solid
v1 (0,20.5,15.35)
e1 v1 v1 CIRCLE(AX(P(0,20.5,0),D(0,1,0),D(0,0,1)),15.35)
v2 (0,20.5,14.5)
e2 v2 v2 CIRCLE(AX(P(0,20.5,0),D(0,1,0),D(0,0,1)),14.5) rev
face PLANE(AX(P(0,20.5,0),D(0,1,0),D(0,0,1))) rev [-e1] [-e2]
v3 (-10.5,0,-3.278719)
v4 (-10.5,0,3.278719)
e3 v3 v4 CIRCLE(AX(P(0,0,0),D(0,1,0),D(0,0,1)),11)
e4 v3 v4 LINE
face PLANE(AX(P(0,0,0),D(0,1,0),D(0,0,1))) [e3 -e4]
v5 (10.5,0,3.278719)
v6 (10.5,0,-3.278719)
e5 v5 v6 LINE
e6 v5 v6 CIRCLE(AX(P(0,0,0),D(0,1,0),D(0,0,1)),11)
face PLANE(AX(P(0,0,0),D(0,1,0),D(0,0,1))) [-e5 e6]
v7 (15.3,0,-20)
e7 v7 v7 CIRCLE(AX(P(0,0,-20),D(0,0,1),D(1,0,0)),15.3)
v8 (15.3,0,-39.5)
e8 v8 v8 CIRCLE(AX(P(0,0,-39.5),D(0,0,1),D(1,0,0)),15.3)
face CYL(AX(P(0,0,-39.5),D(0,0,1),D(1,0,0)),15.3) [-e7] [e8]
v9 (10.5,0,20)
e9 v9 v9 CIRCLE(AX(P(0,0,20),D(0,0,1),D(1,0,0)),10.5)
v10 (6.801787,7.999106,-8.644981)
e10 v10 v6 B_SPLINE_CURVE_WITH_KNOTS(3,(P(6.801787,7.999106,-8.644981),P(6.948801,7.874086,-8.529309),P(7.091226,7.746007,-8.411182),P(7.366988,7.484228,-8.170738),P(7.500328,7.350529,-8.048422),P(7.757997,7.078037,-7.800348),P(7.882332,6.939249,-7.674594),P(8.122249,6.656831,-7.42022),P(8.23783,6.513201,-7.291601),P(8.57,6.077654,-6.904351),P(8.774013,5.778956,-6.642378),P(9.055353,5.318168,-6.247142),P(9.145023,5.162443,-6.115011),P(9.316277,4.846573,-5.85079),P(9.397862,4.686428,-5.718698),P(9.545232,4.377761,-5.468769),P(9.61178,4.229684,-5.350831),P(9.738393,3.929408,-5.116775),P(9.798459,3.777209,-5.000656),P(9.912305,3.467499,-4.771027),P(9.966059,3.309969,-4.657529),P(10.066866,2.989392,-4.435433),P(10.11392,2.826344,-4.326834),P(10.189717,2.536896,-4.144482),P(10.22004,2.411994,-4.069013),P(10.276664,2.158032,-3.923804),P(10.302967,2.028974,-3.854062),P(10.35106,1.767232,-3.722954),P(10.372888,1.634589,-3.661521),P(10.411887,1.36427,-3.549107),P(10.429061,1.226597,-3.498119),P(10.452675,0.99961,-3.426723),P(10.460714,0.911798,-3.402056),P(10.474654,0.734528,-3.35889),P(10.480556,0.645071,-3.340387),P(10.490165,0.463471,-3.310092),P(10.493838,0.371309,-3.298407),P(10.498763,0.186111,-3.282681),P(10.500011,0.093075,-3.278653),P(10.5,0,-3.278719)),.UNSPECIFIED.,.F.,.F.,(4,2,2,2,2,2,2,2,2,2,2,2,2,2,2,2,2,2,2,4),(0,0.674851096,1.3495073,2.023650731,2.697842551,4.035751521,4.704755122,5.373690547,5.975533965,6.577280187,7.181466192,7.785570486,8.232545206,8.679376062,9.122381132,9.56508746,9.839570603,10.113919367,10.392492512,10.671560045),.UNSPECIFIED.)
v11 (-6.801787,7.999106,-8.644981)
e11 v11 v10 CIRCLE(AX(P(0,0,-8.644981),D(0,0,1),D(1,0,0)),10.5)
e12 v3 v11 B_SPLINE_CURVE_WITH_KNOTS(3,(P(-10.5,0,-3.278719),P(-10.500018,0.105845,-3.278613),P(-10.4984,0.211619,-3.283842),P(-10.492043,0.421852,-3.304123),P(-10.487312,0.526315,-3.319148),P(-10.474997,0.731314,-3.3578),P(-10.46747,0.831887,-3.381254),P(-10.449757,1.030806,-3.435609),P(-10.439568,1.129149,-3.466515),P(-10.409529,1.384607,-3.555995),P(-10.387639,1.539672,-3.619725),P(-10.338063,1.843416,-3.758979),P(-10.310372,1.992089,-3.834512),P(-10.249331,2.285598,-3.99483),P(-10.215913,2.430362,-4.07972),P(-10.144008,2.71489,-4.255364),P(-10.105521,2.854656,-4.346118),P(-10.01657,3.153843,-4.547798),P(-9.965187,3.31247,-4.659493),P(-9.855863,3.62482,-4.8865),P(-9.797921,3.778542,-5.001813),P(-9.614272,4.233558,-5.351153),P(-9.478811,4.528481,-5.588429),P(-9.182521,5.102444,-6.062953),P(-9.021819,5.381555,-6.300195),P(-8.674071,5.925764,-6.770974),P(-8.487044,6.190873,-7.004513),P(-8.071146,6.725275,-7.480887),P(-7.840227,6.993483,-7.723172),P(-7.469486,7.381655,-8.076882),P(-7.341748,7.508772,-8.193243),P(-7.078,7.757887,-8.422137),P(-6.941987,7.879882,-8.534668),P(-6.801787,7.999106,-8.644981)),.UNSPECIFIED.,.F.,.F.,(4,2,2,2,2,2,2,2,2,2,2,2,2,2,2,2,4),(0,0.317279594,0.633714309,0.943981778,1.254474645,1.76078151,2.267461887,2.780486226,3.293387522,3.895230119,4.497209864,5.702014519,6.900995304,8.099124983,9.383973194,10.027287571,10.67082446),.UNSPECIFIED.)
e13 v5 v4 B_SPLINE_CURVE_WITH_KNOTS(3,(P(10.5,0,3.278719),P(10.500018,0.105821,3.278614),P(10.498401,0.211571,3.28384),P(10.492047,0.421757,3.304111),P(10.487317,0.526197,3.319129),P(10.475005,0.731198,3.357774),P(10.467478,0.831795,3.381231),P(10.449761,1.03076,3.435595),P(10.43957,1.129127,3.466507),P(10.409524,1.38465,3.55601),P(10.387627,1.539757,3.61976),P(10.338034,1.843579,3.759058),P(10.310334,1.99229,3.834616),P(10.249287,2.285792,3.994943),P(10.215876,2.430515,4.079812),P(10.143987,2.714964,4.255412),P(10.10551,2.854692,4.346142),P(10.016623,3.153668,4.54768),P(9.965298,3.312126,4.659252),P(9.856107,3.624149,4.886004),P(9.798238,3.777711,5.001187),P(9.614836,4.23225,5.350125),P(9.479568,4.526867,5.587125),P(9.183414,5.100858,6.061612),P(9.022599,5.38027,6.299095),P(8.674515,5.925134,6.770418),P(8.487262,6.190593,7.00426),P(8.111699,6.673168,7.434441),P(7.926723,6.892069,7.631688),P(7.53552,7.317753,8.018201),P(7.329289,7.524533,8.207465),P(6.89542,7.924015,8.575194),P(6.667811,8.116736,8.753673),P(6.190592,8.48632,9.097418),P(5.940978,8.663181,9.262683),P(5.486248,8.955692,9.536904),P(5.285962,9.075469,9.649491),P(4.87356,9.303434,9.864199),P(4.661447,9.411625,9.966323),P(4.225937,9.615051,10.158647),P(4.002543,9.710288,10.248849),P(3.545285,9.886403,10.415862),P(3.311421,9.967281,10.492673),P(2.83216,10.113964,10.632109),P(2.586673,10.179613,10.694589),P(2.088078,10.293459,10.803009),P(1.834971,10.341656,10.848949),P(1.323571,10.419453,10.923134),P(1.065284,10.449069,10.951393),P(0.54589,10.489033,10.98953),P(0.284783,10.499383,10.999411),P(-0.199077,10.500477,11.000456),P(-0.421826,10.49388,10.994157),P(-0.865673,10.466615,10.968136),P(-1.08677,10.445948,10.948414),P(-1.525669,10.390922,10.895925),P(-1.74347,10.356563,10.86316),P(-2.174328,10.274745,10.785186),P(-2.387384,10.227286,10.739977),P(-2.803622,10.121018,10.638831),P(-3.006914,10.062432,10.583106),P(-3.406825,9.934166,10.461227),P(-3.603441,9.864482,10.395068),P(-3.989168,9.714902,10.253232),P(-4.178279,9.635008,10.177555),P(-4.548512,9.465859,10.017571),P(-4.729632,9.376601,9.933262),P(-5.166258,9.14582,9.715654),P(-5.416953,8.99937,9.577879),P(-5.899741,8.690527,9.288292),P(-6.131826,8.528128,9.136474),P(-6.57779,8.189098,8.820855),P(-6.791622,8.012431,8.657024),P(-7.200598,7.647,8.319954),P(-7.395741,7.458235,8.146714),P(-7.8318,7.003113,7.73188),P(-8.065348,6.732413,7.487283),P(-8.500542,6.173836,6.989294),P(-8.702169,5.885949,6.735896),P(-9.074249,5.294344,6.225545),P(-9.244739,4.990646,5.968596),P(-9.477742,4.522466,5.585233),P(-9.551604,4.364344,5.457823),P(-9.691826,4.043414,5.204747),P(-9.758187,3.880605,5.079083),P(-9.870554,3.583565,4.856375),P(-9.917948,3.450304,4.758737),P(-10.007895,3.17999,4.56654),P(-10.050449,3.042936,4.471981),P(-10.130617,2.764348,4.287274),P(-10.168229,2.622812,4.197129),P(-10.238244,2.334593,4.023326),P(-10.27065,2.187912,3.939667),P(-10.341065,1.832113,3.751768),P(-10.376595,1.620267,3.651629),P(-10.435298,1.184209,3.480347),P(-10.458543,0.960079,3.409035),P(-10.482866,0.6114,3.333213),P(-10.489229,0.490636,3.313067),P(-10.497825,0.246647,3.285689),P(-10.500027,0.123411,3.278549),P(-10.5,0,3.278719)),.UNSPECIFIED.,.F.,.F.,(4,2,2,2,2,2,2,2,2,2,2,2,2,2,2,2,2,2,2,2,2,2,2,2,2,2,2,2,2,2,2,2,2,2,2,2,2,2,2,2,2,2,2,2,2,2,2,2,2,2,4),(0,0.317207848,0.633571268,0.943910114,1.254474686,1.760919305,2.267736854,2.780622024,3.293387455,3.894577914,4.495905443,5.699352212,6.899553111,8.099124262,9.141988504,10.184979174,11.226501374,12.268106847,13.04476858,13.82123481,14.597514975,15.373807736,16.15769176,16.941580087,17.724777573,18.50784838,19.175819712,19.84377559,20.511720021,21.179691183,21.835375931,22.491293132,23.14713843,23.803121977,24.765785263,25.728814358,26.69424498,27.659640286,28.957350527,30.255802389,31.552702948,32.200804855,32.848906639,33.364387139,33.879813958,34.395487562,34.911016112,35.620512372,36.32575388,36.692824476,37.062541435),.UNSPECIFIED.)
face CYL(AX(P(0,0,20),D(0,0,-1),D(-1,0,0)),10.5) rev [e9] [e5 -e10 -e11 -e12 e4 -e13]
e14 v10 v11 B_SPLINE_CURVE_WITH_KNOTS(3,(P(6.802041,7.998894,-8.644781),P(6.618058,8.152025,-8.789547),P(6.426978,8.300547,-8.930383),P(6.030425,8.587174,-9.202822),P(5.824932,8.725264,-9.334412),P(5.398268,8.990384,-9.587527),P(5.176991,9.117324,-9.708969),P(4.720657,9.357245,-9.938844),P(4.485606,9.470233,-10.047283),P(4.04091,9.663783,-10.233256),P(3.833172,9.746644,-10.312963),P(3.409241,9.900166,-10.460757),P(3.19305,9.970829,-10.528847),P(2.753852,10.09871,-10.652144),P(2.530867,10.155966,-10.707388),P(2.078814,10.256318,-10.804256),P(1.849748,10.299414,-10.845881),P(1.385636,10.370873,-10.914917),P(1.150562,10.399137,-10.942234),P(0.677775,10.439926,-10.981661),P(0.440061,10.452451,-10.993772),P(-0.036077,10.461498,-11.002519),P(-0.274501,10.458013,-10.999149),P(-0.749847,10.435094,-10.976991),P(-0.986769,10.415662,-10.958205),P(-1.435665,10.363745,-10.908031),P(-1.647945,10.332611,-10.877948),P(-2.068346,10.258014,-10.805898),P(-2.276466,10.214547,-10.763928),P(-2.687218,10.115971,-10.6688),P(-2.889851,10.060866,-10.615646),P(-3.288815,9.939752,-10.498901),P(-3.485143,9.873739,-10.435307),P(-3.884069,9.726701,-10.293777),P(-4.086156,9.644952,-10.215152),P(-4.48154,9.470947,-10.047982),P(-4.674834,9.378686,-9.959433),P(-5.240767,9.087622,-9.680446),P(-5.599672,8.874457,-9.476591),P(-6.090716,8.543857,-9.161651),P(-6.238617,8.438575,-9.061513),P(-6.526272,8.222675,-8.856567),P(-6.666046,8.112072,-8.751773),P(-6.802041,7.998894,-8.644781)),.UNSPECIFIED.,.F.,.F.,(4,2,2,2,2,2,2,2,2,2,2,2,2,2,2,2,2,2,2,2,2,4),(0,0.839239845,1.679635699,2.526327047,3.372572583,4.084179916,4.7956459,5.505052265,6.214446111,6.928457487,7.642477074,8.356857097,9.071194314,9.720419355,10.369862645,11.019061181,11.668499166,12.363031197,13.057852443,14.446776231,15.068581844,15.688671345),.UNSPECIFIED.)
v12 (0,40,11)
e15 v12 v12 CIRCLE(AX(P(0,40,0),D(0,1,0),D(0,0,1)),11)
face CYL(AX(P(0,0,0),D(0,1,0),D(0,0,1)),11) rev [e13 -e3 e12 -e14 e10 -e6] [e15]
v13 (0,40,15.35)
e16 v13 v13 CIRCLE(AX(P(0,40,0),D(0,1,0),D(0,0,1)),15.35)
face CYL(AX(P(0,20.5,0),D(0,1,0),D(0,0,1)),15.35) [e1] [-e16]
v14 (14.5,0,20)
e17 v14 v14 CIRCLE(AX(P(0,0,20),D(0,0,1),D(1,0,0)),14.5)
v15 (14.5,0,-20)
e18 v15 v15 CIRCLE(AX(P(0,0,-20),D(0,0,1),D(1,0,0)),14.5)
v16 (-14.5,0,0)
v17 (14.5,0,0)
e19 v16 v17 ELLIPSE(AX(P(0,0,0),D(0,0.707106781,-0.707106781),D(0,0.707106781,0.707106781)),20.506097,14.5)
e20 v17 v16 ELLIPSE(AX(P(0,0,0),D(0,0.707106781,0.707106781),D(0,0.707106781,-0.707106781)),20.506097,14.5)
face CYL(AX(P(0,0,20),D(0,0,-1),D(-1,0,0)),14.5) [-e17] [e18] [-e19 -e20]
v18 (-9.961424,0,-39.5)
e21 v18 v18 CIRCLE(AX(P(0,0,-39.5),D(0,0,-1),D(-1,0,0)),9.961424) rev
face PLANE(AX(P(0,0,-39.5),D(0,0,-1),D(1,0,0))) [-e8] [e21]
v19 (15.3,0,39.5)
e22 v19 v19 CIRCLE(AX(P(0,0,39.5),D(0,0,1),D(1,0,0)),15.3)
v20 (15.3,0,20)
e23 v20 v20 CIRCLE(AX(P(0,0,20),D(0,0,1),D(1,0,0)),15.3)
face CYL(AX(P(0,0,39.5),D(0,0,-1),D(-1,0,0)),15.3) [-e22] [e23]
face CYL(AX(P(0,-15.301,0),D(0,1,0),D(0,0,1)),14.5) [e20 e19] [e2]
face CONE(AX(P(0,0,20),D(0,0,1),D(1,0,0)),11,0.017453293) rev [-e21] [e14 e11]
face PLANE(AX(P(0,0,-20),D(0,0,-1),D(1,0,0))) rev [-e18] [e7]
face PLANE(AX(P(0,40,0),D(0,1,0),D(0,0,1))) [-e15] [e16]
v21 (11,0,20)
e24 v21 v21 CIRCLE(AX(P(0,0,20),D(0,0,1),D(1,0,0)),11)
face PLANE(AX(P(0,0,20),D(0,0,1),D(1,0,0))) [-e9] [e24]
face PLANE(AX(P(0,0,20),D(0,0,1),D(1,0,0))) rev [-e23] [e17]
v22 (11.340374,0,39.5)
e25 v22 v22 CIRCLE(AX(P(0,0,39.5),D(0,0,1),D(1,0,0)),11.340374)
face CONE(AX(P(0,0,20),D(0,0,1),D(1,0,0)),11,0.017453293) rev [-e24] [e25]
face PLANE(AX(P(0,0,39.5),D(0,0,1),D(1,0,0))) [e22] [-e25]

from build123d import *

# Parameters (mm, degrees)
SKETCH1_R                = 14.5
SKETCH1_R_2              = 10.5
BOSS_EXTRUDE1_DEPTH      = 20
SKETCH2_R                = 15.3
SKETCH2_R_2              = 11
BOSS_EXTRUDE2_DEPTH      = 19.5
DRAFT1_ANGLE             = 1
BOSS_EXTRUDE3_REACH      = 71.659
BOSS_EXTRUDE3_END_RADIUS = 14.5
SKETCH4_R                = 14.5
SKETCH5_R                = 15.35
BOSS_EXTRUDE4_DEPTH      = 19.5
SKETCH6_R                = 11
CUT_EXTRUDE1_DEPTH       = 40


# Read off the part's stored shape, not the designer's step: Mirror1
with BuildPart() as part:
    # Sketch1 → Boss-Extrude1 (new, symmetric)
    with BuildSketch(Plane.XY):
        Circle(SKETCH1_R)
        Circle(SKETCH1_R_2, mode=Mode.SUBTRACT)
    extrude(amount=BOSS_EXTRUDE1_DEPTH, both=True)

    # Sketch2 → Boss-Extrude2 (add)
    with BuildSketch(Plane.XY.offset(20)):
        Circle(SKETCH2_R)
        Circle(SKETCH2_R_2, mode=Mode.SUBTRACT)
    extrude(amount=BOSS_EXTRUDE2_DEPTH)

    # Draft1
    draft1_faces = [part.faces().sort_by_distance(p)[0] for p in [
        (-11, 0, 29.75),
    ]]
    draft(draft1_faces, Plane.XY.offset(20), DRAFT1_ANGLE)

    # Mirror1 outline → Mirror1 (revolve)
    with BuildSketch(Plane.XZ):
        Polygon((15.3, -39.5), (15.3, -20), (10.5, -20), (10.5, -8.644980815), (9.961423637, -39.5), align=None)
    revolve(axis=Axis((0, 0, 0), (0, 0, 1)))

    # Boss-Extrude3: up to this cylinder (the profile starts outside it)
    boss_extrude3_end = Plane(origin=(0, 0, 0), z_dir=(0, 0, -1)) * Cylinder(BOSS_EXTRUDE3_END_RADIUS, 173.318, mode=Mode.PRIVATE)
    # Sketch4 → Boss-Extrude3 (add, up to the surface)
    with BuildSketch(Plane(origin=(0, 40, 0), x_dir=(1, 0, 0), z_dir=(0, 1, 0)), mode=Mode.PRIVATE) as boss_extrude3_sk1:
        with Locations(Location((0, 0, 0), (0, 0, 270))):
            Circle(SKETCH4_R)
    boss_extrude3_tool1 = extrude(boss_extrude3_sk1.sketch, amount=-BOSS_EXTRUDE3_REACH, mode=Mode.PRIVATE) - boss_extrude3_end
    add(boss_extrude3_tool1.solids().sort_by_distance((0, 40, 0))[0])

    # Sketch5 → Boss-Extrude4 (add)
    with BuildSketch(Plane(origin=(0, 40, 0), x_dir=(1, 0, 0), z_dir=(0, 1, 0))):
        with Locations(Location((0, 0, 0), (0, 0, 270))):
            Circle(SKETCH5_R)
    extrude(amount=-BOSS_EXTRUDE4_DEPTH)

    # Sketch6 → Cut-Extrude1 (cut)
    with BuildSketch(Plane(origin=(0, 40, 0), x_dir=(1, 0, 0), z_dir=(0, 1, 0))):
        with Locations(Location((0, 0, 0), (0, 0, 270))):
            Circle(SKETCH6_R)
    extrude(amount=-CUT_EXTRUDE1_DEPTH, mode=Mode.SUBTRACT)


solid = part.part
